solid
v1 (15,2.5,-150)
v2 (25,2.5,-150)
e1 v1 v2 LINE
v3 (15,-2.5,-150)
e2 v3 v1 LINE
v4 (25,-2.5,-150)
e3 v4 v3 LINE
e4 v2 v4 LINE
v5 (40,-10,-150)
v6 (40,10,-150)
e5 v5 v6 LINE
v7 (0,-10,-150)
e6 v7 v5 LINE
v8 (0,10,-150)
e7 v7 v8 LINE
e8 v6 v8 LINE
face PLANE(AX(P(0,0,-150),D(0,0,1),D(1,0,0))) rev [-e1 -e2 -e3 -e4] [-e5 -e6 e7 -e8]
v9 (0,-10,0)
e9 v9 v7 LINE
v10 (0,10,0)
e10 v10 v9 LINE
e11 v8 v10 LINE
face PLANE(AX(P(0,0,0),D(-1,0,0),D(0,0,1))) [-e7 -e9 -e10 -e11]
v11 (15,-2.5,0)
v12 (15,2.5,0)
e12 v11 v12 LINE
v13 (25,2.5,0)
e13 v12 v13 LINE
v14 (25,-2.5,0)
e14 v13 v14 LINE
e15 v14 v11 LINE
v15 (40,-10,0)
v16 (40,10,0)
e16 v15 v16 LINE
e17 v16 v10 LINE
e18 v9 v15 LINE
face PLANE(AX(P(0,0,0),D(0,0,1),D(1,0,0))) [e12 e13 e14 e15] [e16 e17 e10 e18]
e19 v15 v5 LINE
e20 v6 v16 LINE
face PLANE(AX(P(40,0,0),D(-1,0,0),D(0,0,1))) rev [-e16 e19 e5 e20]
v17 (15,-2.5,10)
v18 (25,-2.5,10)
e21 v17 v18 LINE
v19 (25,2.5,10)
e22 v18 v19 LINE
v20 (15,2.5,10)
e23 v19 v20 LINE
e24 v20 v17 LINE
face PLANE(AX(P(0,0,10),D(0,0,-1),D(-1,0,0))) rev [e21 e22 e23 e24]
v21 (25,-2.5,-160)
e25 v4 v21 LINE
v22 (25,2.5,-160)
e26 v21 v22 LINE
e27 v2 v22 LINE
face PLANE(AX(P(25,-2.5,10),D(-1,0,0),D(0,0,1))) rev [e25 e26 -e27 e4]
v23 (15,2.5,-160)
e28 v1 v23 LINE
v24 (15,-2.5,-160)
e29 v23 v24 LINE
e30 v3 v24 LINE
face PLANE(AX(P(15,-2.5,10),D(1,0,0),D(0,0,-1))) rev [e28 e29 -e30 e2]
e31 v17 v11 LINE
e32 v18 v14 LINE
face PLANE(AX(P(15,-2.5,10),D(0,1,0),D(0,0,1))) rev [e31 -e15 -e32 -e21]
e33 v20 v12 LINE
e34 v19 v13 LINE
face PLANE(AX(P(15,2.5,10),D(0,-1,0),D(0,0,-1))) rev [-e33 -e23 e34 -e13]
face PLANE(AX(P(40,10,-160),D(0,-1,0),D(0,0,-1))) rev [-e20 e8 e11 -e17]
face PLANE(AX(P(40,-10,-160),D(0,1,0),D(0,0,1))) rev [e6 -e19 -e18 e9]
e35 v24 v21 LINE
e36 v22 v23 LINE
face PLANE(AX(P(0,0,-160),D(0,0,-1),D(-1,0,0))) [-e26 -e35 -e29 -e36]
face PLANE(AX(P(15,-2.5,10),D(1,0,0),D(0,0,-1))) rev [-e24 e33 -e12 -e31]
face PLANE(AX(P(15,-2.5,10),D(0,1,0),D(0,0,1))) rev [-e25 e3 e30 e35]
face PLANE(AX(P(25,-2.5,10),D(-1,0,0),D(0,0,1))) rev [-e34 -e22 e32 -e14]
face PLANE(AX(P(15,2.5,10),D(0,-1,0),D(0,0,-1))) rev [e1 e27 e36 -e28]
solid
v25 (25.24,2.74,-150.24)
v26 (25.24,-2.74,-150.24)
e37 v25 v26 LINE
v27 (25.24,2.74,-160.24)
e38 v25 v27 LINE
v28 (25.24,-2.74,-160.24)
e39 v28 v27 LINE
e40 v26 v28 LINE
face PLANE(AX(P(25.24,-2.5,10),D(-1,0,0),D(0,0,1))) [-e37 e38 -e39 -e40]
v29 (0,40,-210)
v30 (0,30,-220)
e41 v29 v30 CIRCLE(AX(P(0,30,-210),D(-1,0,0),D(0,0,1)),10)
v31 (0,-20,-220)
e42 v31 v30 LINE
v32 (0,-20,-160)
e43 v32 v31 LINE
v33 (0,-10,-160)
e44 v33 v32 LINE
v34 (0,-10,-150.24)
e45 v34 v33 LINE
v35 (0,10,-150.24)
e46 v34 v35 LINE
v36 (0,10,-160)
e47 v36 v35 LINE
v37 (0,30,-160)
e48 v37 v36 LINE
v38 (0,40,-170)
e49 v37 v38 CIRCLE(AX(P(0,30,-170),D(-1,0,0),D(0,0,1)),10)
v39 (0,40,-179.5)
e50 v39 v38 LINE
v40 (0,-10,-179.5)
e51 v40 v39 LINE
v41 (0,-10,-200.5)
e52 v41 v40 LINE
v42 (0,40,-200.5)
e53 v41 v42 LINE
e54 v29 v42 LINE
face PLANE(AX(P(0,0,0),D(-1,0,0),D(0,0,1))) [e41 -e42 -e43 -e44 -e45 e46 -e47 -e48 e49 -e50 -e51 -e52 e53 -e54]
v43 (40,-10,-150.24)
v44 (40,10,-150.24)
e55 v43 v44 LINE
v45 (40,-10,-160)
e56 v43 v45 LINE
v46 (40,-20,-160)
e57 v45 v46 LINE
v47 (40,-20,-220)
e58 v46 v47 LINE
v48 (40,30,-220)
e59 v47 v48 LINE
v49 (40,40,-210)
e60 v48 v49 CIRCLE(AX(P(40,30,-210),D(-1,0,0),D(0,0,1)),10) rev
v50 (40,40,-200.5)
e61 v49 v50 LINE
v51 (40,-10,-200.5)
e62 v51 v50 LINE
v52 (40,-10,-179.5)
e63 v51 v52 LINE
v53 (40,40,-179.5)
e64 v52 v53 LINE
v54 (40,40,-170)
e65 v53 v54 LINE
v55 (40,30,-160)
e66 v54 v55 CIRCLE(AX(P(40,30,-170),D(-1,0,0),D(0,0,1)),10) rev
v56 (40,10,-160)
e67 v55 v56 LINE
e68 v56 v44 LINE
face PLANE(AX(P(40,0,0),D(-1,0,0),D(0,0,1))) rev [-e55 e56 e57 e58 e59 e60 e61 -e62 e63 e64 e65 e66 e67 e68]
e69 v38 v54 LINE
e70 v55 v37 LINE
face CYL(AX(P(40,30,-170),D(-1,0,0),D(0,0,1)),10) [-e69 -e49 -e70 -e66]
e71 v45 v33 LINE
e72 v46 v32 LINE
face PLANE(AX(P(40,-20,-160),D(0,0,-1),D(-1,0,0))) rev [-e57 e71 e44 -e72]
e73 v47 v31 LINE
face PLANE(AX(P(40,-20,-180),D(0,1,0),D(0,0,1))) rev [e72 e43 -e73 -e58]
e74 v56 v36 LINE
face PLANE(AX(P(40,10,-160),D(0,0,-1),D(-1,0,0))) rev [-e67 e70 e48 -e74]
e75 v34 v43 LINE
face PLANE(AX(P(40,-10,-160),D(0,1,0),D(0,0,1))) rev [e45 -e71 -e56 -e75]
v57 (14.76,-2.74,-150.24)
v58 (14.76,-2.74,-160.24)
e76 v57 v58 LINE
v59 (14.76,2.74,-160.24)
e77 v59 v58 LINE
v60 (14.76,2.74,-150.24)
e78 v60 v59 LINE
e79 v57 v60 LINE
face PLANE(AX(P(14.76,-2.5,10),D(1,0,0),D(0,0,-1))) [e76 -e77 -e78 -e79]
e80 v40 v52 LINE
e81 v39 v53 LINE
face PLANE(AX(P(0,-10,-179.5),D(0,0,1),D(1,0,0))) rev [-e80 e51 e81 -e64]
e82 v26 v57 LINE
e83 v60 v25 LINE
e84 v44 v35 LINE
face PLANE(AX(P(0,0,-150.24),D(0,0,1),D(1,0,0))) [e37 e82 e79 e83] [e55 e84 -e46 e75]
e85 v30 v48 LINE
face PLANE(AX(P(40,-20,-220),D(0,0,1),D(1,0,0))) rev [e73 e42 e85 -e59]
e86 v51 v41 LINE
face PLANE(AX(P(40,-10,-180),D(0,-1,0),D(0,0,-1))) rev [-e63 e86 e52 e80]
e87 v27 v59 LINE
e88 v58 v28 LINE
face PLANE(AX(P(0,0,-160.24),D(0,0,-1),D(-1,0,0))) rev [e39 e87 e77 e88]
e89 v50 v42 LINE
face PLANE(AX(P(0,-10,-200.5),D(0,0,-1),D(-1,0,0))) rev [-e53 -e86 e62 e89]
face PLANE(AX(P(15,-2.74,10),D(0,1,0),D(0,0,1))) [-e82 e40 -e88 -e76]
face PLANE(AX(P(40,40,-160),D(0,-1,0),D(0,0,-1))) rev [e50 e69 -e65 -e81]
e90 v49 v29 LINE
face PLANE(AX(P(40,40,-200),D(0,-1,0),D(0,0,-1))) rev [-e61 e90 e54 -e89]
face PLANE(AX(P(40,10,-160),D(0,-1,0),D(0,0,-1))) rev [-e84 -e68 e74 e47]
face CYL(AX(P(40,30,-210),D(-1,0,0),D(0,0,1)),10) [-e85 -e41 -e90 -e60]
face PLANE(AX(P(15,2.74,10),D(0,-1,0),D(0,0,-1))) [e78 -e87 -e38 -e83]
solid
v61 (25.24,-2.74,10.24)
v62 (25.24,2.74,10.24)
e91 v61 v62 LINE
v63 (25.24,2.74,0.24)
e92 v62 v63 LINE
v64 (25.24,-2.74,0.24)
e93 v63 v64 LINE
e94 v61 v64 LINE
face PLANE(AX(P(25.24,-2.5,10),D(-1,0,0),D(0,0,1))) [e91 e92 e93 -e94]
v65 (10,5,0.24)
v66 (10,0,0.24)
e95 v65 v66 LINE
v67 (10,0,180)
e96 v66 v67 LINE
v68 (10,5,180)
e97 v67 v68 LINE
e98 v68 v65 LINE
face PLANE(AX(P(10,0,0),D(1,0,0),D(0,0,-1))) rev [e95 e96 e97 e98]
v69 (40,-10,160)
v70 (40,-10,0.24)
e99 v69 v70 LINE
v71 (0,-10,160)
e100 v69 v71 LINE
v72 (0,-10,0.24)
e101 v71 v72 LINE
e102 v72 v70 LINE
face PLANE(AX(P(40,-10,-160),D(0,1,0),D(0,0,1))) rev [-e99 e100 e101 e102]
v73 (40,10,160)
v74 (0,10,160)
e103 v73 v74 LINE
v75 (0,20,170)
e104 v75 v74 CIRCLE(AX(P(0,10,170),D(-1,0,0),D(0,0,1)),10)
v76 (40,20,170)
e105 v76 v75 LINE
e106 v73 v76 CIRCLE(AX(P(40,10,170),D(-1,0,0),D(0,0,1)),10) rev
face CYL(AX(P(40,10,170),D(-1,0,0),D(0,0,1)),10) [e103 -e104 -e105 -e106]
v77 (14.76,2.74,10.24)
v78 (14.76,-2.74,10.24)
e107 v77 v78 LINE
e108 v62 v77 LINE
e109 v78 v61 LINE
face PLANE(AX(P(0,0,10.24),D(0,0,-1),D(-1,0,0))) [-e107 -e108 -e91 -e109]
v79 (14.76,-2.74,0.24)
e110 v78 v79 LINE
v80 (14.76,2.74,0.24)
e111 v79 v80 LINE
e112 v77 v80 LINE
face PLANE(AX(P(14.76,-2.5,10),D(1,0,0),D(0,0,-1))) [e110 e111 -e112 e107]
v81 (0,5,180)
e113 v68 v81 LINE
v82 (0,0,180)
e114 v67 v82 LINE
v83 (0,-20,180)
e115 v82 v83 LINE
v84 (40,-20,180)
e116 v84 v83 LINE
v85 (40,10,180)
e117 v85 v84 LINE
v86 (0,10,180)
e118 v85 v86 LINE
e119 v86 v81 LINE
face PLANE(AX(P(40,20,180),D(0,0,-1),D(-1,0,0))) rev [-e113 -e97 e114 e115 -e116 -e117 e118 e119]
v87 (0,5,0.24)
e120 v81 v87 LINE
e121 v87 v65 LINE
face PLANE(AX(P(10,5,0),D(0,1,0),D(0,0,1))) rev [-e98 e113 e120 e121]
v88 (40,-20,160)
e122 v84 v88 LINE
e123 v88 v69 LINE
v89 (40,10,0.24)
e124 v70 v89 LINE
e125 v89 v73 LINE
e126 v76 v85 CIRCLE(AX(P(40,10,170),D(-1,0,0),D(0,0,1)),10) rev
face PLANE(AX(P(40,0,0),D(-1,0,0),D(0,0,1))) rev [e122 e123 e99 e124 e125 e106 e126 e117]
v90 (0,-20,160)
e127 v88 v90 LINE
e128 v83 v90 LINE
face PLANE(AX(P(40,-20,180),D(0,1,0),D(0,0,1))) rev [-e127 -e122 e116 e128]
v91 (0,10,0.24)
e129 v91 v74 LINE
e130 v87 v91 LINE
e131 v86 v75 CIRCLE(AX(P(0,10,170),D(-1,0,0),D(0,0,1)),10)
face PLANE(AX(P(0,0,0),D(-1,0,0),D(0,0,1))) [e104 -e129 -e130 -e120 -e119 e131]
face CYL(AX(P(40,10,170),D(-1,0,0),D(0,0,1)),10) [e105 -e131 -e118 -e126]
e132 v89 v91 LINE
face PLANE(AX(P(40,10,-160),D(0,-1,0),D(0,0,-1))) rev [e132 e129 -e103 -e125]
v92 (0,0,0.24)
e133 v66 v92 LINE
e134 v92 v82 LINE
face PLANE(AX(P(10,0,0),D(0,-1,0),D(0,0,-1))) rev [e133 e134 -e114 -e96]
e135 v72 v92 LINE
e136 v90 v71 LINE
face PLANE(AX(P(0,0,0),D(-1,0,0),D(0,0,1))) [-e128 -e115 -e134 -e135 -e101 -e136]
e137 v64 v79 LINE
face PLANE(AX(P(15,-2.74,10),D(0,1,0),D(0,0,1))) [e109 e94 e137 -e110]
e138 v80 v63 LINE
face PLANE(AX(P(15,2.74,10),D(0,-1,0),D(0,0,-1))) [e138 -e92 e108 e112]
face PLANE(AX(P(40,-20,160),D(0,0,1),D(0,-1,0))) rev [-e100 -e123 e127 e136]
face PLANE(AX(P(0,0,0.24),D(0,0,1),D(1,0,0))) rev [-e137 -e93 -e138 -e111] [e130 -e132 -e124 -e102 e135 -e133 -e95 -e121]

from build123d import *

# Parameters (mm, degrees)
BOSS_EXTRUDE1_DEPTH        = 40
FILLET1_R                  = 10
FILLET2_R                  = 10
SKETCH3_W                  = 180
SKETCH3_H                  = 5
CUT_EXTRUDE2_DEPTH         = 10
SKETCH4_W                  = 40
SKETCH4_H                  = 21
CUT_EXTRUDE3_DEPTH         = 50
CROQUIS1_W                 = 10
CROQUIS1_H                 = 5
SALIENTE_EXTRUIR1_DEPTH    = 85
INDENTACI_N1_OUTLINE_W     = 10.48
INDENTACI_N1_OUTLINE_H     = 5.48
INDENTACI_N1_DEPTH         = 10.24
INDENTACI_N1_2_OUTLINE_W   = 10.48
INDENTACI_N1_2_OUTLINE_H   = 5.48
INDENTACI_N1_2_DEPTH       = 0.24
INDENTACI_N2_START         = -160.24
INDENTACI_N2_OUTLINE_W     = 10.48
INDENTACI_N2_OUTLINE_H     = 5.48
INDENTACI_N2_DEPTH         = 10.24
INDENTACI_N2_START_2       = -150.24
INDENTACI_N2_2_OUTLINE_W   = 40
INDENTACI_N2_2_OUTLINE_H   = 20
INDENTACI_N2_2_OUTLINE_W_2 = 10.48
INDENTACI_N2_2_OUTLINE_H_2 = 5.48
INDENTACI_N2_2_DEPTH       = 0.24


# Read off the part's stored shape, not the designer's step: Indentación1, Indentación2
with BuildPart() as part:
    # Sketch2 → Boss-Extrude1 (new body)
    with BuildSketch(Plane(origin=(0, 0, 0), x_dir=(0, 0, -1), z_dir=(1, 0, 0))):
        Polygon((-160, 10), (-160, 20), (-180, 20), (-180, -20), (-160, -20), (-160, -10), (160, -10), (160, -20), (180, -20), (220, -20), (220, 40), (200, 40), (200, -10), (180, -10), (180, 40), (160, 40), (160, 10), align=None)
    extrude(amount=BOSS_EXTRUDE1_DEPTH)

    # Fillet1
    fillet1_edges = [part.edges().sort_by_distance(p)[0] for p in [
        (20, 20, 180),
        (20, 20, 160),
    ]]
    fillet(fillet1_edges, radius=FILLET1_R - 0.0001)  # a hair under: the kernel refuses the full size

    # Fillet2
    fillet2_edges = [part.edges().sort_by_distance(p)[0] for p in [
        (20, 40, -160),
        (20, 40, -220),
    ]]
    fillet(fillet2_edges, radius=FILLET2_R)

    # Sketch3 → Cut-Extrude2 (cut)
    with BuildSketch(Plane.ZY):
        with Locations((90, 2.5)):
            Rectangle(SKETCH3_W, SKETCH3_H)
    extrude(amount=-CUT_EXTRUDE2_DEPTH, mode=Mode.SUBTRACT)

    # Sketch4 → Cut-Extrude3 (cut)
    with BuildSketch(Plane(origin=(0, 40, 0), x_dir=(1, 0, 0), z_dir=(0, 1, 0))):
        with Locations((20, 190)):
            Rectangle(SKETCH4_W, SKETCH4_H)
    extrude(amount=-CUT_EXTRUDE3_DEPTH, mode=Mode.SUBTRACT)


with BuildPart() as body_2:
    # Partir1: the piece on the far side of the plane
    add(part.part)
    split(bisect_by=Plane.XY, keep=Keep.BOTTOM)


with BuildPart() as part_1:
    add(part.part)

    # Partir1
    split(bisect_by=Plane.XY, keep=Keep.TOP)

    # Indentación1 outline → Indentación1 (cut)
    with BuildSketch(Plane.XY):
        with Locations((20, 0)):
            Rectangle(INDENTACI_N1_OUTLINE_W, INDENTACI_N1_OUTLINE_H)
    extrude(amount=INDENTACI_N1_DEPTH, mode=Mode.SUBTRACT)

    # Indentaci_n1 2 outline → Indentaci_n1 2 (cut)
    with BuildSketch(Plane.XY):
        Polygon((0, -10), (40, -10), (40, 10), (0, 10), (0, 5), (10, 5), (10, 0), (0, 0), align=None)
        with Locations((20, 0)):
            Rectangle(INDENTACI_N1_2_OUTLINE_W, INDENTACI_N1_2_OUTLINE_H, mode=Mode.SUBTRACT)
    extrude(amount=INDENTACI_N1_2_DEPTH, mode=Mode.SUBTRACT)


with BuildPart() as body_3:
    # Partir2: the piece on the far side of the plane
    add(body_2.part)
    split(bisect_by=Plane.XY.offset(-150), keep=Keep.BOTTOM)

    # Indentación2 outline → Indentación2 (cut)
    with BuildSketch(Plane.XY.offset(INDENTACI_N2_START)):
        with Locations((20, 0)):
            Rectangle(INDENTACI_N2_OUTLINE_W, INDENTACI_N2_OUTLINE_H)
    extrude(amount=INDENTACI_N2_DEPTH, mode=Mode.SUBTRACT)

    # Indentaci_n2 2 outline → Indentaci_n2 2 (cut)
    with BuildSketch(Plane.XY.offset(INDENTACI_N2_START_2)):
        with Locations((20, 0)):
            Rectangle(INDENTACI_N2_2_OUTLINE_W, INDENTACI_N2_2_OUTLINE_H)
        with Locations((20, 0)):
            Rectangle(INDENTACI_N2_2_OUTLINE_W_2, INDENTACI_N2_2_OUTLINE_H_2, mode=Mode.SUBTRACT)
    extrude(amount=INDENTACI_N2_2_DEPTH, mode=Mode.SUBTRACT)


with BuildPart() as body_2_1:
    add(body_2.part)

    # Partir2
    split(bisect_by=Plane.XY.offset(-150), keep=Keep.TOP)

    # Croquis1 → Saliente-Extruir1 (add, symmetric)
    with BuildSketch(Plane.XY.offset(-75)):
        with Locations((20, 0)):
            Rectangle(CROQUIS1_W, CROQUIS1_H)
    extrude(amount=SALIENTE_EXTRUIR1_DEPTH, both=True)


solid = Compound([part_1.part, body_3.part, body_2_1.part])
